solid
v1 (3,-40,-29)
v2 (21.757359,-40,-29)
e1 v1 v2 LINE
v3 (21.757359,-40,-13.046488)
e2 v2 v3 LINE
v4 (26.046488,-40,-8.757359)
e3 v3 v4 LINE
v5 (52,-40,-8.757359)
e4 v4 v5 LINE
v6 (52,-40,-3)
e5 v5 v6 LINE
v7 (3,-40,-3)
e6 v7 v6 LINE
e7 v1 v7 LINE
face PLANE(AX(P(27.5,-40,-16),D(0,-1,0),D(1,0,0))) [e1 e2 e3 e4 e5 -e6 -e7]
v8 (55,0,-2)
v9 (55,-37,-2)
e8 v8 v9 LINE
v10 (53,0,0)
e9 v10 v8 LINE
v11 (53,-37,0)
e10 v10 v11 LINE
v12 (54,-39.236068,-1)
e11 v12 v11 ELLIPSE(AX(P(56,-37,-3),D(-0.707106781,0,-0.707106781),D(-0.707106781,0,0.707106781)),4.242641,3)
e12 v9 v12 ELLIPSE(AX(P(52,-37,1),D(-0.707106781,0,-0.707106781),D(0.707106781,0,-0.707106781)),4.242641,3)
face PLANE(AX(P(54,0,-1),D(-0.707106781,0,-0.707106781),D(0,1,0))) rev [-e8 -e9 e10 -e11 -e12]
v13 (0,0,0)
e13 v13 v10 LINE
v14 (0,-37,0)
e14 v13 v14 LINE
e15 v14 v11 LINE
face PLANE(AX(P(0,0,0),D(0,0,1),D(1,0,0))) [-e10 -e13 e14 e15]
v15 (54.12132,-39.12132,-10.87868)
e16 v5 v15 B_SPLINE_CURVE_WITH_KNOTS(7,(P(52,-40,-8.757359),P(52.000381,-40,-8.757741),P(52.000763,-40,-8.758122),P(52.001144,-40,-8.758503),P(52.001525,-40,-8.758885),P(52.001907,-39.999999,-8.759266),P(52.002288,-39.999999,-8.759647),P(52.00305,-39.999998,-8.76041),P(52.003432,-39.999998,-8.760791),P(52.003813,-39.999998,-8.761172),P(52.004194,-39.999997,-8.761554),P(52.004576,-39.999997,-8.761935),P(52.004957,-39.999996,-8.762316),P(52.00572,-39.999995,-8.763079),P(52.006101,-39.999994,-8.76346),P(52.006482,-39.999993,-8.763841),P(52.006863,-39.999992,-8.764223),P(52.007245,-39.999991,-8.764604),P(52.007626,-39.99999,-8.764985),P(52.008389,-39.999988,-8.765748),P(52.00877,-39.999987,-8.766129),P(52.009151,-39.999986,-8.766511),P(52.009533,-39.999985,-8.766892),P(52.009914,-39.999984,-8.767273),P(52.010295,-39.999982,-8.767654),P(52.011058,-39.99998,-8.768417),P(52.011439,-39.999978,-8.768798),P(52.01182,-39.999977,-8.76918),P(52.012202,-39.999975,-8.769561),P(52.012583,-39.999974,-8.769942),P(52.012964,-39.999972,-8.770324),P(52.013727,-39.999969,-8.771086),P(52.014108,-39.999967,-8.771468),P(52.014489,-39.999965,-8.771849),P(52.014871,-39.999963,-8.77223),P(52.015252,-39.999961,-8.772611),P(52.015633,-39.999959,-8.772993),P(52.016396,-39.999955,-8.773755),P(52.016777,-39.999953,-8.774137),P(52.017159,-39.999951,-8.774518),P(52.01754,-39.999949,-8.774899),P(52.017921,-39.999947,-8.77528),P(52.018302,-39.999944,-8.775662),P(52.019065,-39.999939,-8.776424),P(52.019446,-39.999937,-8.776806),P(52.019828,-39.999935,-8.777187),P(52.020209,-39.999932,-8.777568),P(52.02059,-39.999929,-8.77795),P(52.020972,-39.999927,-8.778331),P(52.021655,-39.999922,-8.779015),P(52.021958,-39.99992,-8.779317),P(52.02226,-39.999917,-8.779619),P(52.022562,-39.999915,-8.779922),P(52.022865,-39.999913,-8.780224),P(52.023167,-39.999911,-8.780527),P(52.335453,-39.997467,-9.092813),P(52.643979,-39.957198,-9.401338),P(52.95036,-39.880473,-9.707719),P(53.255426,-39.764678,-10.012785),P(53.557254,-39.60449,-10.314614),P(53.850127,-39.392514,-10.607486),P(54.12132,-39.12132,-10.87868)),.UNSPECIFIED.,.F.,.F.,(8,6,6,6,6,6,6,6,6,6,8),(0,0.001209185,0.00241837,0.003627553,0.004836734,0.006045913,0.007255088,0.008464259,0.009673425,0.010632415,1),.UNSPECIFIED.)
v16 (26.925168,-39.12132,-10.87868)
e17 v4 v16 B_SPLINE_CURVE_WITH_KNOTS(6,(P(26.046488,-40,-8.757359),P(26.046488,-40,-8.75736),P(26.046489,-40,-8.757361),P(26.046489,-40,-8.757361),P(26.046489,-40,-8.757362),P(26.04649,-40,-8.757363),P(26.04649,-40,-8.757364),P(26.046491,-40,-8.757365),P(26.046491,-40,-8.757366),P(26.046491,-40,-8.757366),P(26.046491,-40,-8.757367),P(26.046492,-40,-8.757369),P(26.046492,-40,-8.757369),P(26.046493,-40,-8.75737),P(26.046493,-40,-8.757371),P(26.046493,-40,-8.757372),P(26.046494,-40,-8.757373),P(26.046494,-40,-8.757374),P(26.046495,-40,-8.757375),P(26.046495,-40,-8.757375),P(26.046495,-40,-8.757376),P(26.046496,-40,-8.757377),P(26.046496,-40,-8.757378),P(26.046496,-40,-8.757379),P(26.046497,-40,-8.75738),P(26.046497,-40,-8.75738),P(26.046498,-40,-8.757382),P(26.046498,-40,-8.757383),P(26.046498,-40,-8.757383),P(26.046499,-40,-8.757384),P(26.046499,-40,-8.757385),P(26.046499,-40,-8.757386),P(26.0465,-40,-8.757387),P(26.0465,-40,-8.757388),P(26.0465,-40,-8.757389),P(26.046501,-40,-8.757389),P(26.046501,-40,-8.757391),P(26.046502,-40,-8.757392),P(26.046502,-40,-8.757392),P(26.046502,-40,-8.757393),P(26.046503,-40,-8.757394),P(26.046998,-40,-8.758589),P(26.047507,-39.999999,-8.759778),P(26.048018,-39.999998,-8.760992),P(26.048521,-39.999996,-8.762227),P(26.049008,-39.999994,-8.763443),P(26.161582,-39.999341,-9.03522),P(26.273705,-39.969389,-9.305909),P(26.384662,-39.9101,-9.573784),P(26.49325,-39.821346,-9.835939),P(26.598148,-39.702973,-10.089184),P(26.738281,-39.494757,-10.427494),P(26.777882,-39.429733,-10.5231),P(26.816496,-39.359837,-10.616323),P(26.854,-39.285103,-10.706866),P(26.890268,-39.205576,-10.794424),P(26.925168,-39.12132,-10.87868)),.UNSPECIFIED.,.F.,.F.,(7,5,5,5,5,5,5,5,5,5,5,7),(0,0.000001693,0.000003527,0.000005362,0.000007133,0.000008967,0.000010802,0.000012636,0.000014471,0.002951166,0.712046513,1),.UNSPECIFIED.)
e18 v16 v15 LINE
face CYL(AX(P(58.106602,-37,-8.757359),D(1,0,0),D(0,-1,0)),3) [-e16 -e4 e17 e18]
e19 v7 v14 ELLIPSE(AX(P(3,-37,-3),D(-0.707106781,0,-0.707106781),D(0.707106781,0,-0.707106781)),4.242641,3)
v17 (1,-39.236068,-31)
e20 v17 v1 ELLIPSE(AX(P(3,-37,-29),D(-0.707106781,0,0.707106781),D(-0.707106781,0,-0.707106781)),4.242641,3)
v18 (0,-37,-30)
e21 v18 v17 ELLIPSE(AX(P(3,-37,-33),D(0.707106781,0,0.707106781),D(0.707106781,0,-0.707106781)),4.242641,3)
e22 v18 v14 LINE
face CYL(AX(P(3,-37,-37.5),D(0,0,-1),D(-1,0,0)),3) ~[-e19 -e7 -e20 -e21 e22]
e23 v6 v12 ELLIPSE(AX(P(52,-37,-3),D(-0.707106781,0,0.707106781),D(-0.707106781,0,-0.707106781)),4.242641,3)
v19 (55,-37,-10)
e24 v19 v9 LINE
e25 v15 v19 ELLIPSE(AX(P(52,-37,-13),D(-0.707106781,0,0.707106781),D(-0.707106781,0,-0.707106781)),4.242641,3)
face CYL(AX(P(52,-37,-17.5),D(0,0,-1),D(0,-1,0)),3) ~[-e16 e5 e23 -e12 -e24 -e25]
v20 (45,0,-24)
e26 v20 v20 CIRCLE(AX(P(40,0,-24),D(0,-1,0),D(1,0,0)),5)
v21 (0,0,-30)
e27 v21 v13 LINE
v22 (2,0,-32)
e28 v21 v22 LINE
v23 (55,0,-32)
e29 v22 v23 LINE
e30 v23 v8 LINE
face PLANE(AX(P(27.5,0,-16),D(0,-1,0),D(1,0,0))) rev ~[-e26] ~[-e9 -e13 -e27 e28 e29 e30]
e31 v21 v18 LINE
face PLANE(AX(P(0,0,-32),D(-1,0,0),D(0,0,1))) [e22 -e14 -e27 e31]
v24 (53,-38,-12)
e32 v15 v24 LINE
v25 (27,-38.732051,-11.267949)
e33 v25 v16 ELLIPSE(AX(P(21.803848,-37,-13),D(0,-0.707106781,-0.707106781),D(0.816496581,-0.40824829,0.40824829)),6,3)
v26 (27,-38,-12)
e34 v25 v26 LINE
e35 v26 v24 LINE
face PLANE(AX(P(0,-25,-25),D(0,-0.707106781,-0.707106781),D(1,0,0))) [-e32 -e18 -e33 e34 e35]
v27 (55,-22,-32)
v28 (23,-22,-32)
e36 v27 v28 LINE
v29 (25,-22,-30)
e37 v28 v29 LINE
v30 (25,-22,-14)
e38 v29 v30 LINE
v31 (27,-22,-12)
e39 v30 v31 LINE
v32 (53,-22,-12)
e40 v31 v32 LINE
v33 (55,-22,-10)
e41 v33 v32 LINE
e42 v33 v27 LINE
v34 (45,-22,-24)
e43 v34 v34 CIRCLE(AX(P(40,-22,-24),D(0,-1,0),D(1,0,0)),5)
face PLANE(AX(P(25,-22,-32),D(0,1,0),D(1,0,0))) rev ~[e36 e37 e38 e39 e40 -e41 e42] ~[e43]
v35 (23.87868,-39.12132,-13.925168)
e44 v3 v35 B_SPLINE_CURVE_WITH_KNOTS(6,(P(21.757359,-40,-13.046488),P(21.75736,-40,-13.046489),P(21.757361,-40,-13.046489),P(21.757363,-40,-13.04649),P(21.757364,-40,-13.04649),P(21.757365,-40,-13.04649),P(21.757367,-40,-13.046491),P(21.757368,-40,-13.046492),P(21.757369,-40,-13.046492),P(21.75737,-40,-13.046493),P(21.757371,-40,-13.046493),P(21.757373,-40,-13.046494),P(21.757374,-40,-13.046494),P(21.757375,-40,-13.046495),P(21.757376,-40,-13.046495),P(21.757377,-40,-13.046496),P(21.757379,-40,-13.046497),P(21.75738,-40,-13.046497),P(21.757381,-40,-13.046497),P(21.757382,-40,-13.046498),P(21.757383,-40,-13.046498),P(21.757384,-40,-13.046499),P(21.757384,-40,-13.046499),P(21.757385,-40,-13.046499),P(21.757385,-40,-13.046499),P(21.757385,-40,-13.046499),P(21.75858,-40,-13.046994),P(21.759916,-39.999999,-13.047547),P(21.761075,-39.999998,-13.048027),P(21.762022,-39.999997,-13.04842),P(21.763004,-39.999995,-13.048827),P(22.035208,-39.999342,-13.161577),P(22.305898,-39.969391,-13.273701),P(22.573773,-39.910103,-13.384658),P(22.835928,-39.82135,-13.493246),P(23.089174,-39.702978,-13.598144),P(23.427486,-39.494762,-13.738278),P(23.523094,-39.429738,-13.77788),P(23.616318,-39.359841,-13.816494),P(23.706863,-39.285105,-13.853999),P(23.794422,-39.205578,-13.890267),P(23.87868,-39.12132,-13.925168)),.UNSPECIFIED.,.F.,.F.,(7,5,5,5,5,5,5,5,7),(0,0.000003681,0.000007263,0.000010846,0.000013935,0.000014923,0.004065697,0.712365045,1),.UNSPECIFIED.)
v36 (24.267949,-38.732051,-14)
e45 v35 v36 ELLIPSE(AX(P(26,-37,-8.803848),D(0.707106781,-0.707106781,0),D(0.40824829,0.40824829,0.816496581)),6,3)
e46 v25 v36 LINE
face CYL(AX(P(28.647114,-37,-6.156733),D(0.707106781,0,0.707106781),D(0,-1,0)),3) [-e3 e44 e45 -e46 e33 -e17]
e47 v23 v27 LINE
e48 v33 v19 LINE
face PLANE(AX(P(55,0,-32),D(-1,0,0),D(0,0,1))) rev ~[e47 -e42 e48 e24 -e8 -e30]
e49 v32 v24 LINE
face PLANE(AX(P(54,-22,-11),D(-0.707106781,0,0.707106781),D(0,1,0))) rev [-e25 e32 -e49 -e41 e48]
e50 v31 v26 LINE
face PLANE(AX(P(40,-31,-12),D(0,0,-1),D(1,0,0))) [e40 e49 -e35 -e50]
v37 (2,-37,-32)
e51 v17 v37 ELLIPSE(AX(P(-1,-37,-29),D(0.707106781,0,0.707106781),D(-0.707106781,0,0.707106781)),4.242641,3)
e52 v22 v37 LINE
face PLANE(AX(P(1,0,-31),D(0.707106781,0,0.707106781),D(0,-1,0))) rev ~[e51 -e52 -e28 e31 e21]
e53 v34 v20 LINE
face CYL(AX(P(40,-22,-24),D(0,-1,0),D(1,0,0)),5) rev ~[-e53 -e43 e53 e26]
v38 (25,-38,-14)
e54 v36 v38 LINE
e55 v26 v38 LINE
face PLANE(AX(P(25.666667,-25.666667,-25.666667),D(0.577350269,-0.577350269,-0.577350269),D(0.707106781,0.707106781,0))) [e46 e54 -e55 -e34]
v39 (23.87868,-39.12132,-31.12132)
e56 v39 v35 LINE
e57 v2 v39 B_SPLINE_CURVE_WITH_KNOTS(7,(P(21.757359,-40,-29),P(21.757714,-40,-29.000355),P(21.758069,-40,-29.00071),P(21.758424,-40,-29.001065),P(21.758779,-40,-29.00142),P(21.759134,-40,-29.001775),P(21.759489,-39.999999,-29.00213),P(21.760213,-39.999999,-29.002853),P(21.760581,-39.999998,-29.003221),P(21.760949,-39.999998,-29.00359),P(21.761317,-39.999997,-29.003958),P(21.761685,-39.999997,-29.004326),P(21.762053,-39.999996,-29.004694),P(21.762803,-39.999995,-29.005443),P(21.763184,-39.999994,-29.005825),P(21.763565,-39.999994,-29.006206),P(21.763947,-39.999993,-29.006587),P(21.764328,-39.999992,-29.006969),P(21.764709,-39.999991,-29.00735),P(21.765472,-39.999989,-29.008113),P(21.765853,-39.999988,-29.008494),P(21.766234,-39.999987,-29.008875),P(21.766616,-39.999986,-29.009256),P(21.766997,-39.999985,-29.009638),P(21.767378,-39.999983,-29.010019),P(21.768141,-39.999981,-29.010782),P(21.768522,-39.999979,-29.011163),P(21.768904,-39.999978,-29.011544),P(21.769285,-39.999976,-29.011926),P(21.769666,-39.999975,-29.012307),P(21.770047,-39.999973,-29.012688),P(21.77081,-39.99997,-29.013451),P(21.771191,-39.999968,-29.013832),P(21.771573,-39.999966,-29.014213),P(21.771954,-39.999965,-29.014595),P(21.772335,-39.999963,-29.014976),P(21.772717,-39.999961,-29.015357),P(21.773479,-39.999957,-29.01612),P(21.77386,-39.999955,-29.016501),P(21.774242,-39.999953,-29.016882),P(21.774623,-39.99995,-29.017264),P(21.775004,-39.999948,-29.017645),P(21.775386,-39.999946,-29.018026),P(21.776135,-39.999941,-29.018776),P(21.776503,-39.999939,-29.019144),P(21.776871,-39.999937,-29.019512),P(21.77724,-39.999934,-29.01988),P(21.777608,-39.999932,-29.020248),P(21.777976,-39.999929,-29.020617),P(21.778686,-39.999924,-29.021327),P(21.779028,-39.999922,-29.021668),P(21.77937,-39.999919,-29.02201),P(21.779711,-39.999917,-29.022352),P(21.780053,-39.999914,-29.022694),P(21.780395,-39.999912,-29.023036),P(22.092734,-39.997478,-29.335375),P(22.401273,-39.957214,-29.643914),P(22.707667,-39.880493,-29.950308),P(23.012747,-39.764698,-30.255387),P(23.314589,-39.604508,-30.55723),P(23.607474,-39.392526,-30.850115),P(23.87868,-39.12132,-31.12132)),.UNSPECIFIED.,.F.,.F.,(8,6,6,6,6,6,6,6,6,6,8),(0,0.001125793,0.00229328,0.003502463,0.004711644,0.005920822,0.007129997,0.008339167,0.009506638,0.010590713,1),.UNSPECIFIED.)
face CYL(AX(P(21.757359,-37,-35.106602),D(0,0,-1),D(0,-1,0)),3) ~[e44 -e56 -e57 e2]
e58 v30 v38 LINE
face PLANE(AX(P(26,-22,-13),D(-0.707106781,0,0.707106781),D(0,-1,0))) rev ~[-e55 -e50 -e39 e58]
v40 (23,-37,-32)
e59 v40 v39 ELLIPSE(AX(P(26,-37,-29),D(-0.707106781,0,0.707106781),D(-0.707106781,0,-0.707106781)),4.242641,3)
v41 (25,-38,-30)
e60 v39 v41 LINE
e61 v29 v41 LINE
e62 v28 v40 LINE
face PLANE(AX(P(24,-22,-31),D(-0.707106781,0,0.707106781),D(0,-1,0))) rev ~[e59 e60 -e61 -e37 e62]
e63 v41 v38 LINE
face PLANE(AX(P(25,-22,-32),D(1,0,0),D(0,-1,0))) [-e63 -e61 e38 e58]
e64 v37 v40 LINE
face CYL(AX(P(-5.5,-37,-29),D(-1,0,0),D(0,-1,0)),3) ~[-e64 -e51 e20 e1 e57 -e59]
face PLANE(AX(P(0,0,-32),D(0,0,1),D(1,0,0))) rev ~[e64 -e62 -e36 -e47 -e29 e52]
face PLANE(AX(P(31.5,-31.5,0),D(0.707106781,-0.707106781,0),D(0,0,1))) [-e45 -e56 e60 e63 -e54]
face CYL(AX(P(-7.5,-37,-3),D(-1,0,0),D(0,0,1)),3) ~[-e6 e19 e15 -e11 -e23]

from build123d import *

# Parameters (mm, degrees)
F0_W         = 55
F0_H         = 32
F1_DEPTH     = 40
F2_W         = 30
F2_H         = 18
F3_DEPTH     = 20
F4_R         = 5
F5_DEPTH     = 22.001
F6_SIZE      = 2
F7_T1_DEPTH  = 36
F7_T3_DEPTH  = 45
F7_T5_DEPTH  = 68
F7_T7_DEPTH  = 23
F7_T12_DEPTH = 34.2132034356
F7_T17_DEPTH = 24.2132034356
F7_T22_DEPTH = 13.4214256026
F7_T29_DEPTH = 34.2132034356
F7_T33_DEPTH = 13.4214256026
F7_T40_DEPTH = 13.4214256026
F7_T44_DEPTH = 24.2132034356


# Not quite as in the source:
# - a fillet or chamfer that OpenCascade refuses, or shapes differently, is made with other operations: its cross-section is extruded or revolved along the edge and cut away or added


with BuildPart() as f1:
    # F0 (on Front) → F1 (new body)
    with BuildSketch(Plane.XZ):
        with Locations((27.5, -16)):
            Rectangle(F0_W, F0_H)
    extrude(amount=F1_DEPTH)

    # F2 (on face) → F3 (cut)
    with BuildSketch(Plane(origin=(0, 0, -32), x_dir=(1, 0, 0), z_dir=(0, 0, -1))):
        with Locations((40, 31)):
            Rectangle(F2_W, F2_H)
    extrude(amount=-F3_DEPTH, mode=Mode.SUBTRACT)

    # F4 (on face) → F5 (cut, through all)
    with BuildSketch(Plane.XZ.offset(22)):
        with Locations((40, -24)):
            Circle(F4_R)
    extrude(amount=-F5_DEPTH, mode=Mode.SUBTRACT)

    # F6
    f6_edges = [f1.edges().sort_by_distance(p)[0] for p in [
        (25, -40, -22),
        (25, -31, -32),
        (25, -31, -12),
        (55, -31, -12),
        (40, -40, -12),
        (55, -20, 0),
        (0, -20, -32),
    ]]
    chamfer(f6_edges, length=F6_SIZE)

    # F7: fillet of radius 3 on 7 edges, made by hand

    # F7_s2 → F7_t1 (cut)
    with BuildSketch(Plane.YZ.offset(-5.5)):
        with BuildLine():
            ThreePointArc((-40, -29), (-39.1213203436, -31.1213203436), (-37, -32))
            Line((-37, -32), (-40, -32))
            Line((-40, -32), (-40, -29))
        make_face()
    extrude(amount=F7_T1_DEPTH, mode=Mode.SUBTRACT)

    # F7_s4 → F7_t3 (cut)
    with BuildSketch(Plane.XY.offset(-37.5)):
        with BuildLine():
            ThreePointArc((0, -37), (0.8786796564, -39.1213203436), (3, -40))
            Line((3, -40), (0, -40))
            Line((0, -40), (0, -37))
        make_face()
    extrude(amount=F7_T3_DEPTH, mode=Mode.SUBTRACT)

    # F7_s6 → F7_t5 (cut)
    with BuildSketch(Plane.YZ.offset(-7.5)):
        with BuildLine():
            ThreePointArc((-37, 0), (-39.1213203436, -0.8786796564), (-40, -3))
            Line((-40, -3), (-40, 0))
            Line((-40, 0), (-37, 0))
        make_face()
    extrude(amount=F7_T5_DEPTH, mode=Mode.SUBTRACT)

    # F7_s8 → F7_t7 (cut)
    with BuildSketch(Plane.XY.offset(-17.5)):
        with BuildLine():
            ThreePointArc((52, -40), (54.1213203436, -39.1213203436), (55, -37))
            Line((55, -37), (55, -40))
            Line((55, -40), (52, -40))
        make_face()
    extrude(amount=F7_T7_DEPTH, mode=Mode.SUBTRACT)


with BuildPart() as f7_tool10:
    # F7_s11 → F7_t12 (new body)
    with BuildSketch(Plane.YZ.offset(58.1066017178)):
        with BuildLine():
            ThreePointArc((-40, -8.7573593129), (-39.7716385975, -9.90540961), (-39.1213203436, -10.8786796564))
            Line((-39.1213203436, -10.8786796564), (-40, -10))
            Line((-40, -10), (-40, -8.7573593129))
        make_face()
    extrude(amount=-F7_T12_DEPTH)

    split(bisect_by=Plane(origin=(25.6666666667, -25.6666666667, -25.6666666667), x_dir=(0.7071067812, 0.7071067812, 0), z_dir=(0.5773502692, -0.5773502692, -0.5773502692)), keep=Keep.TOP)


with BuildPart() as f1_1:
    add(f1.part)

    # F7_t9: cut F7_tool10
    add(f7_tool10.part, mode=Mode.SUBTRACT)


with BuildPart() as f7_tool15:
    # F7_s16 → F7_t17 (new body)
    with BuildSketch(Plane.XY.offset(-35.1066017178)):
        with BuildLine():
            ThreePointArc((21.7573593129, -40), (22.90540961, -39.7716385975), (23.8786796564, -39.1213203436))
            Line((23.8786796564, -39.1213203436), (23, -40))
            Line((23, -40), (21.7573593129, -40))
        make_face()
    extrude(amount=F7_T17_DEPTH)

    split(bisect_by=Plane(origin=(25.6666666667, -25.6666666667, -25.6666666667), x_dir=(0.7071067812, 0.7071067812, 0), z_dir=(0.5773502692, -0.5773502692, -0.5773502692)), keep=Keep.TOP)


with BuildPart() as f1_2:
    add(f1_1.part)

    # F7_t14: cut F7_tool15
    add(f7_tool15.part, mode=Mode.SUBTRACT)


with BuildPart() as f7_tool20:
    # F7_s21 → F7_t22 (new body)
    with BuildSketch(Plane(origin=(11.2451905284, 0, 11.2451905284), x_dir=(0, 1, 0), z_dir=(-0.7071067812, 0, -0.7071067812))):
        with BuildLine():
            ThreePointArc((-40, 24.6100366333), (-39.6642215019, 25.9891391634), (-38.7320508076, 27.0595263761))
            Line((-38.7320508076, 27.0595263761), (-40, 26.1629509039))
            Line((-40, 26.1629509039), (-40, 24.6100366333))
        make_face()
    extrude(amount=F7_T22_DEPTH)

    split(bisect_by=Plane(origin=(0, -25, -25), x_dir=(1, 0, 0), z_dir=(0, -0.7071067812, -0.7071067812)), keep=Keep.TOP)

    split(bisect_by=Plane(origin=(31.5, -31.5, 0), x_dir=(0, 0, 1), z_dir=(0.7071067812, -0.7071067812, 0)), keep=Keep.TOP)


with BuildPart() as f1_3:
    add(f1_2.part)

    # F7_t19: cut F7_tool20
    add(f7_tool20.part, mode=Mode.SUBTRACT)


with BuildPart() as f7_tool27:
    # F7_s28 → F7_t29 (new body)
    with BuildSketch(Plane.YZ.offset(58.1066017178)):
        with BuildLine():
            ThreePointArc((-40, -8.7573593129), (-39.7716385975, -9.90540961), (-39.1213203436, -10.8786796564))
            Line((-39.1213203436, -10.8786796564), (-40, -10))
            Line((-40, -10), (-40, -8.7573593129))
        make_face()
    extrude(amount=-F7_T29_DEPTH)

    split(bisect_by=Plane(origin=(25.6666666667, -25.6666666667, -25.6666666667), x_dir=(-0.7071067812, -0.7071067812, 0), z_dir=(-0.5773502692, 0.5773502692, 0.5773502692)), keep=Keep.TOP)


with BuildPart() as f7_tool31:
    # F7_s32 → F7_t33 (new body)
    with BuildSketch(Plane(origin=(11.2451905284, 0, 11.2451905284), x_dir=(0, 1, 0), z_dir=(-0.7071067812, 0, -0.7071067812))):
        with BuildLine():
            ThreePointArc((-40, 24.6100366333), (-39.6642215019, 25.9891391634), (-38.7320508076, 27.0595263761))
            Line((-38.7320508076, 27.0595263761), (-40, 26.1629509039))
            Line((-40, 26.1629509039), (-40, 24.6100366333))
        make_face()
    extrude(amount=F7_T33_DEPTH)

    split(bisect_by=Plane(origin=(0, -25, -25), x_dir=(1, 0, 0), z_dir=(0, 0.7071067812, 0.7071067812)), keep=Keep.TOP)


with BuildPart() as f7_tool27_1:
    add(f7_tool27.part)

    # F7_t35: intersect F7_tool31
    add(f7_tool31.part, mode=Mode.INTERSECT)


with BuildPart() as f1_4:
    add(f1_3.part)

    # F7_t25: cut F7_tool27
    add(f7_tool27_1.part, mode=Mode.SUBTRACT)


with BuildPart() as f7_tool38:
    # F7_s39 → F7_t40 (new body)
    with BuildSketch(Plane(origin=(11.2451905284, 0, 11.2451905284), x_dir=(0, 1, 0), z_dir=(-0.7071067812, 0, -0.7071067812))):
        with BuildLine():
            ThreePointArc((-40, 24.6100366333), (-39.6642215019, 25.9891391634), (-38.7320508076, 27.0595263761))
            Line((-38.7320508076, 27.0595263761), (-40, 26.1629509039))
            Line((-40, 26.1629509039), (-40, 24.6100366333))
        make_face()
    extrude(amount=F7_T40_DEPTH)

    split(bisect_by=Plane(origin=(31.5, -31.5, 0), x_dir=(0, 0, 1), z_dir=(-0.7071067812, 0.7071067812, 0)), keep=Keep.TOP)


with BuildPart() as f7_tool42:
    # F7_s43 → F7_t44 (new body)
    with BuildSketch(Plane.XY.offset(-35.1066017178)):
        with BuildLine():
            ThreePointArc((21.7573593129, -40), (22.90540961, -39.7716385975), (23.8786796564, -39.1213203436))
            Line((23.8786796564, -39.1213203436), (23, -40))
            Line((23, -40), (21.7573593129, -40))
        make_face()
    extrude(amount=F7_T44_DEPTH)

    split(bisect_by=Plane(origin=(25.6666666667, -25.6666666667, -25.6666666667), x_dir=(-0.7071067812, -0.7071067812, 0), z_dir=(-0.5773502692, 0.5773502692, 0.5773502692)), keep=Keep.TOP)


with BuildPart() as f7_tool38_1:
    add(f7_tool38.part)

    # F7_t46: intersect F7_tool42
    add(f7_tool42.part, mode=Mode.INTERSECT)


with BuildPart() as f1_5:
    add(f1_4.part)

    # F7_t36: cut F7_tool38
    add(f7_tool38_1.part, mode=Mode.SUBTRACT)


solid = f1_5.part
